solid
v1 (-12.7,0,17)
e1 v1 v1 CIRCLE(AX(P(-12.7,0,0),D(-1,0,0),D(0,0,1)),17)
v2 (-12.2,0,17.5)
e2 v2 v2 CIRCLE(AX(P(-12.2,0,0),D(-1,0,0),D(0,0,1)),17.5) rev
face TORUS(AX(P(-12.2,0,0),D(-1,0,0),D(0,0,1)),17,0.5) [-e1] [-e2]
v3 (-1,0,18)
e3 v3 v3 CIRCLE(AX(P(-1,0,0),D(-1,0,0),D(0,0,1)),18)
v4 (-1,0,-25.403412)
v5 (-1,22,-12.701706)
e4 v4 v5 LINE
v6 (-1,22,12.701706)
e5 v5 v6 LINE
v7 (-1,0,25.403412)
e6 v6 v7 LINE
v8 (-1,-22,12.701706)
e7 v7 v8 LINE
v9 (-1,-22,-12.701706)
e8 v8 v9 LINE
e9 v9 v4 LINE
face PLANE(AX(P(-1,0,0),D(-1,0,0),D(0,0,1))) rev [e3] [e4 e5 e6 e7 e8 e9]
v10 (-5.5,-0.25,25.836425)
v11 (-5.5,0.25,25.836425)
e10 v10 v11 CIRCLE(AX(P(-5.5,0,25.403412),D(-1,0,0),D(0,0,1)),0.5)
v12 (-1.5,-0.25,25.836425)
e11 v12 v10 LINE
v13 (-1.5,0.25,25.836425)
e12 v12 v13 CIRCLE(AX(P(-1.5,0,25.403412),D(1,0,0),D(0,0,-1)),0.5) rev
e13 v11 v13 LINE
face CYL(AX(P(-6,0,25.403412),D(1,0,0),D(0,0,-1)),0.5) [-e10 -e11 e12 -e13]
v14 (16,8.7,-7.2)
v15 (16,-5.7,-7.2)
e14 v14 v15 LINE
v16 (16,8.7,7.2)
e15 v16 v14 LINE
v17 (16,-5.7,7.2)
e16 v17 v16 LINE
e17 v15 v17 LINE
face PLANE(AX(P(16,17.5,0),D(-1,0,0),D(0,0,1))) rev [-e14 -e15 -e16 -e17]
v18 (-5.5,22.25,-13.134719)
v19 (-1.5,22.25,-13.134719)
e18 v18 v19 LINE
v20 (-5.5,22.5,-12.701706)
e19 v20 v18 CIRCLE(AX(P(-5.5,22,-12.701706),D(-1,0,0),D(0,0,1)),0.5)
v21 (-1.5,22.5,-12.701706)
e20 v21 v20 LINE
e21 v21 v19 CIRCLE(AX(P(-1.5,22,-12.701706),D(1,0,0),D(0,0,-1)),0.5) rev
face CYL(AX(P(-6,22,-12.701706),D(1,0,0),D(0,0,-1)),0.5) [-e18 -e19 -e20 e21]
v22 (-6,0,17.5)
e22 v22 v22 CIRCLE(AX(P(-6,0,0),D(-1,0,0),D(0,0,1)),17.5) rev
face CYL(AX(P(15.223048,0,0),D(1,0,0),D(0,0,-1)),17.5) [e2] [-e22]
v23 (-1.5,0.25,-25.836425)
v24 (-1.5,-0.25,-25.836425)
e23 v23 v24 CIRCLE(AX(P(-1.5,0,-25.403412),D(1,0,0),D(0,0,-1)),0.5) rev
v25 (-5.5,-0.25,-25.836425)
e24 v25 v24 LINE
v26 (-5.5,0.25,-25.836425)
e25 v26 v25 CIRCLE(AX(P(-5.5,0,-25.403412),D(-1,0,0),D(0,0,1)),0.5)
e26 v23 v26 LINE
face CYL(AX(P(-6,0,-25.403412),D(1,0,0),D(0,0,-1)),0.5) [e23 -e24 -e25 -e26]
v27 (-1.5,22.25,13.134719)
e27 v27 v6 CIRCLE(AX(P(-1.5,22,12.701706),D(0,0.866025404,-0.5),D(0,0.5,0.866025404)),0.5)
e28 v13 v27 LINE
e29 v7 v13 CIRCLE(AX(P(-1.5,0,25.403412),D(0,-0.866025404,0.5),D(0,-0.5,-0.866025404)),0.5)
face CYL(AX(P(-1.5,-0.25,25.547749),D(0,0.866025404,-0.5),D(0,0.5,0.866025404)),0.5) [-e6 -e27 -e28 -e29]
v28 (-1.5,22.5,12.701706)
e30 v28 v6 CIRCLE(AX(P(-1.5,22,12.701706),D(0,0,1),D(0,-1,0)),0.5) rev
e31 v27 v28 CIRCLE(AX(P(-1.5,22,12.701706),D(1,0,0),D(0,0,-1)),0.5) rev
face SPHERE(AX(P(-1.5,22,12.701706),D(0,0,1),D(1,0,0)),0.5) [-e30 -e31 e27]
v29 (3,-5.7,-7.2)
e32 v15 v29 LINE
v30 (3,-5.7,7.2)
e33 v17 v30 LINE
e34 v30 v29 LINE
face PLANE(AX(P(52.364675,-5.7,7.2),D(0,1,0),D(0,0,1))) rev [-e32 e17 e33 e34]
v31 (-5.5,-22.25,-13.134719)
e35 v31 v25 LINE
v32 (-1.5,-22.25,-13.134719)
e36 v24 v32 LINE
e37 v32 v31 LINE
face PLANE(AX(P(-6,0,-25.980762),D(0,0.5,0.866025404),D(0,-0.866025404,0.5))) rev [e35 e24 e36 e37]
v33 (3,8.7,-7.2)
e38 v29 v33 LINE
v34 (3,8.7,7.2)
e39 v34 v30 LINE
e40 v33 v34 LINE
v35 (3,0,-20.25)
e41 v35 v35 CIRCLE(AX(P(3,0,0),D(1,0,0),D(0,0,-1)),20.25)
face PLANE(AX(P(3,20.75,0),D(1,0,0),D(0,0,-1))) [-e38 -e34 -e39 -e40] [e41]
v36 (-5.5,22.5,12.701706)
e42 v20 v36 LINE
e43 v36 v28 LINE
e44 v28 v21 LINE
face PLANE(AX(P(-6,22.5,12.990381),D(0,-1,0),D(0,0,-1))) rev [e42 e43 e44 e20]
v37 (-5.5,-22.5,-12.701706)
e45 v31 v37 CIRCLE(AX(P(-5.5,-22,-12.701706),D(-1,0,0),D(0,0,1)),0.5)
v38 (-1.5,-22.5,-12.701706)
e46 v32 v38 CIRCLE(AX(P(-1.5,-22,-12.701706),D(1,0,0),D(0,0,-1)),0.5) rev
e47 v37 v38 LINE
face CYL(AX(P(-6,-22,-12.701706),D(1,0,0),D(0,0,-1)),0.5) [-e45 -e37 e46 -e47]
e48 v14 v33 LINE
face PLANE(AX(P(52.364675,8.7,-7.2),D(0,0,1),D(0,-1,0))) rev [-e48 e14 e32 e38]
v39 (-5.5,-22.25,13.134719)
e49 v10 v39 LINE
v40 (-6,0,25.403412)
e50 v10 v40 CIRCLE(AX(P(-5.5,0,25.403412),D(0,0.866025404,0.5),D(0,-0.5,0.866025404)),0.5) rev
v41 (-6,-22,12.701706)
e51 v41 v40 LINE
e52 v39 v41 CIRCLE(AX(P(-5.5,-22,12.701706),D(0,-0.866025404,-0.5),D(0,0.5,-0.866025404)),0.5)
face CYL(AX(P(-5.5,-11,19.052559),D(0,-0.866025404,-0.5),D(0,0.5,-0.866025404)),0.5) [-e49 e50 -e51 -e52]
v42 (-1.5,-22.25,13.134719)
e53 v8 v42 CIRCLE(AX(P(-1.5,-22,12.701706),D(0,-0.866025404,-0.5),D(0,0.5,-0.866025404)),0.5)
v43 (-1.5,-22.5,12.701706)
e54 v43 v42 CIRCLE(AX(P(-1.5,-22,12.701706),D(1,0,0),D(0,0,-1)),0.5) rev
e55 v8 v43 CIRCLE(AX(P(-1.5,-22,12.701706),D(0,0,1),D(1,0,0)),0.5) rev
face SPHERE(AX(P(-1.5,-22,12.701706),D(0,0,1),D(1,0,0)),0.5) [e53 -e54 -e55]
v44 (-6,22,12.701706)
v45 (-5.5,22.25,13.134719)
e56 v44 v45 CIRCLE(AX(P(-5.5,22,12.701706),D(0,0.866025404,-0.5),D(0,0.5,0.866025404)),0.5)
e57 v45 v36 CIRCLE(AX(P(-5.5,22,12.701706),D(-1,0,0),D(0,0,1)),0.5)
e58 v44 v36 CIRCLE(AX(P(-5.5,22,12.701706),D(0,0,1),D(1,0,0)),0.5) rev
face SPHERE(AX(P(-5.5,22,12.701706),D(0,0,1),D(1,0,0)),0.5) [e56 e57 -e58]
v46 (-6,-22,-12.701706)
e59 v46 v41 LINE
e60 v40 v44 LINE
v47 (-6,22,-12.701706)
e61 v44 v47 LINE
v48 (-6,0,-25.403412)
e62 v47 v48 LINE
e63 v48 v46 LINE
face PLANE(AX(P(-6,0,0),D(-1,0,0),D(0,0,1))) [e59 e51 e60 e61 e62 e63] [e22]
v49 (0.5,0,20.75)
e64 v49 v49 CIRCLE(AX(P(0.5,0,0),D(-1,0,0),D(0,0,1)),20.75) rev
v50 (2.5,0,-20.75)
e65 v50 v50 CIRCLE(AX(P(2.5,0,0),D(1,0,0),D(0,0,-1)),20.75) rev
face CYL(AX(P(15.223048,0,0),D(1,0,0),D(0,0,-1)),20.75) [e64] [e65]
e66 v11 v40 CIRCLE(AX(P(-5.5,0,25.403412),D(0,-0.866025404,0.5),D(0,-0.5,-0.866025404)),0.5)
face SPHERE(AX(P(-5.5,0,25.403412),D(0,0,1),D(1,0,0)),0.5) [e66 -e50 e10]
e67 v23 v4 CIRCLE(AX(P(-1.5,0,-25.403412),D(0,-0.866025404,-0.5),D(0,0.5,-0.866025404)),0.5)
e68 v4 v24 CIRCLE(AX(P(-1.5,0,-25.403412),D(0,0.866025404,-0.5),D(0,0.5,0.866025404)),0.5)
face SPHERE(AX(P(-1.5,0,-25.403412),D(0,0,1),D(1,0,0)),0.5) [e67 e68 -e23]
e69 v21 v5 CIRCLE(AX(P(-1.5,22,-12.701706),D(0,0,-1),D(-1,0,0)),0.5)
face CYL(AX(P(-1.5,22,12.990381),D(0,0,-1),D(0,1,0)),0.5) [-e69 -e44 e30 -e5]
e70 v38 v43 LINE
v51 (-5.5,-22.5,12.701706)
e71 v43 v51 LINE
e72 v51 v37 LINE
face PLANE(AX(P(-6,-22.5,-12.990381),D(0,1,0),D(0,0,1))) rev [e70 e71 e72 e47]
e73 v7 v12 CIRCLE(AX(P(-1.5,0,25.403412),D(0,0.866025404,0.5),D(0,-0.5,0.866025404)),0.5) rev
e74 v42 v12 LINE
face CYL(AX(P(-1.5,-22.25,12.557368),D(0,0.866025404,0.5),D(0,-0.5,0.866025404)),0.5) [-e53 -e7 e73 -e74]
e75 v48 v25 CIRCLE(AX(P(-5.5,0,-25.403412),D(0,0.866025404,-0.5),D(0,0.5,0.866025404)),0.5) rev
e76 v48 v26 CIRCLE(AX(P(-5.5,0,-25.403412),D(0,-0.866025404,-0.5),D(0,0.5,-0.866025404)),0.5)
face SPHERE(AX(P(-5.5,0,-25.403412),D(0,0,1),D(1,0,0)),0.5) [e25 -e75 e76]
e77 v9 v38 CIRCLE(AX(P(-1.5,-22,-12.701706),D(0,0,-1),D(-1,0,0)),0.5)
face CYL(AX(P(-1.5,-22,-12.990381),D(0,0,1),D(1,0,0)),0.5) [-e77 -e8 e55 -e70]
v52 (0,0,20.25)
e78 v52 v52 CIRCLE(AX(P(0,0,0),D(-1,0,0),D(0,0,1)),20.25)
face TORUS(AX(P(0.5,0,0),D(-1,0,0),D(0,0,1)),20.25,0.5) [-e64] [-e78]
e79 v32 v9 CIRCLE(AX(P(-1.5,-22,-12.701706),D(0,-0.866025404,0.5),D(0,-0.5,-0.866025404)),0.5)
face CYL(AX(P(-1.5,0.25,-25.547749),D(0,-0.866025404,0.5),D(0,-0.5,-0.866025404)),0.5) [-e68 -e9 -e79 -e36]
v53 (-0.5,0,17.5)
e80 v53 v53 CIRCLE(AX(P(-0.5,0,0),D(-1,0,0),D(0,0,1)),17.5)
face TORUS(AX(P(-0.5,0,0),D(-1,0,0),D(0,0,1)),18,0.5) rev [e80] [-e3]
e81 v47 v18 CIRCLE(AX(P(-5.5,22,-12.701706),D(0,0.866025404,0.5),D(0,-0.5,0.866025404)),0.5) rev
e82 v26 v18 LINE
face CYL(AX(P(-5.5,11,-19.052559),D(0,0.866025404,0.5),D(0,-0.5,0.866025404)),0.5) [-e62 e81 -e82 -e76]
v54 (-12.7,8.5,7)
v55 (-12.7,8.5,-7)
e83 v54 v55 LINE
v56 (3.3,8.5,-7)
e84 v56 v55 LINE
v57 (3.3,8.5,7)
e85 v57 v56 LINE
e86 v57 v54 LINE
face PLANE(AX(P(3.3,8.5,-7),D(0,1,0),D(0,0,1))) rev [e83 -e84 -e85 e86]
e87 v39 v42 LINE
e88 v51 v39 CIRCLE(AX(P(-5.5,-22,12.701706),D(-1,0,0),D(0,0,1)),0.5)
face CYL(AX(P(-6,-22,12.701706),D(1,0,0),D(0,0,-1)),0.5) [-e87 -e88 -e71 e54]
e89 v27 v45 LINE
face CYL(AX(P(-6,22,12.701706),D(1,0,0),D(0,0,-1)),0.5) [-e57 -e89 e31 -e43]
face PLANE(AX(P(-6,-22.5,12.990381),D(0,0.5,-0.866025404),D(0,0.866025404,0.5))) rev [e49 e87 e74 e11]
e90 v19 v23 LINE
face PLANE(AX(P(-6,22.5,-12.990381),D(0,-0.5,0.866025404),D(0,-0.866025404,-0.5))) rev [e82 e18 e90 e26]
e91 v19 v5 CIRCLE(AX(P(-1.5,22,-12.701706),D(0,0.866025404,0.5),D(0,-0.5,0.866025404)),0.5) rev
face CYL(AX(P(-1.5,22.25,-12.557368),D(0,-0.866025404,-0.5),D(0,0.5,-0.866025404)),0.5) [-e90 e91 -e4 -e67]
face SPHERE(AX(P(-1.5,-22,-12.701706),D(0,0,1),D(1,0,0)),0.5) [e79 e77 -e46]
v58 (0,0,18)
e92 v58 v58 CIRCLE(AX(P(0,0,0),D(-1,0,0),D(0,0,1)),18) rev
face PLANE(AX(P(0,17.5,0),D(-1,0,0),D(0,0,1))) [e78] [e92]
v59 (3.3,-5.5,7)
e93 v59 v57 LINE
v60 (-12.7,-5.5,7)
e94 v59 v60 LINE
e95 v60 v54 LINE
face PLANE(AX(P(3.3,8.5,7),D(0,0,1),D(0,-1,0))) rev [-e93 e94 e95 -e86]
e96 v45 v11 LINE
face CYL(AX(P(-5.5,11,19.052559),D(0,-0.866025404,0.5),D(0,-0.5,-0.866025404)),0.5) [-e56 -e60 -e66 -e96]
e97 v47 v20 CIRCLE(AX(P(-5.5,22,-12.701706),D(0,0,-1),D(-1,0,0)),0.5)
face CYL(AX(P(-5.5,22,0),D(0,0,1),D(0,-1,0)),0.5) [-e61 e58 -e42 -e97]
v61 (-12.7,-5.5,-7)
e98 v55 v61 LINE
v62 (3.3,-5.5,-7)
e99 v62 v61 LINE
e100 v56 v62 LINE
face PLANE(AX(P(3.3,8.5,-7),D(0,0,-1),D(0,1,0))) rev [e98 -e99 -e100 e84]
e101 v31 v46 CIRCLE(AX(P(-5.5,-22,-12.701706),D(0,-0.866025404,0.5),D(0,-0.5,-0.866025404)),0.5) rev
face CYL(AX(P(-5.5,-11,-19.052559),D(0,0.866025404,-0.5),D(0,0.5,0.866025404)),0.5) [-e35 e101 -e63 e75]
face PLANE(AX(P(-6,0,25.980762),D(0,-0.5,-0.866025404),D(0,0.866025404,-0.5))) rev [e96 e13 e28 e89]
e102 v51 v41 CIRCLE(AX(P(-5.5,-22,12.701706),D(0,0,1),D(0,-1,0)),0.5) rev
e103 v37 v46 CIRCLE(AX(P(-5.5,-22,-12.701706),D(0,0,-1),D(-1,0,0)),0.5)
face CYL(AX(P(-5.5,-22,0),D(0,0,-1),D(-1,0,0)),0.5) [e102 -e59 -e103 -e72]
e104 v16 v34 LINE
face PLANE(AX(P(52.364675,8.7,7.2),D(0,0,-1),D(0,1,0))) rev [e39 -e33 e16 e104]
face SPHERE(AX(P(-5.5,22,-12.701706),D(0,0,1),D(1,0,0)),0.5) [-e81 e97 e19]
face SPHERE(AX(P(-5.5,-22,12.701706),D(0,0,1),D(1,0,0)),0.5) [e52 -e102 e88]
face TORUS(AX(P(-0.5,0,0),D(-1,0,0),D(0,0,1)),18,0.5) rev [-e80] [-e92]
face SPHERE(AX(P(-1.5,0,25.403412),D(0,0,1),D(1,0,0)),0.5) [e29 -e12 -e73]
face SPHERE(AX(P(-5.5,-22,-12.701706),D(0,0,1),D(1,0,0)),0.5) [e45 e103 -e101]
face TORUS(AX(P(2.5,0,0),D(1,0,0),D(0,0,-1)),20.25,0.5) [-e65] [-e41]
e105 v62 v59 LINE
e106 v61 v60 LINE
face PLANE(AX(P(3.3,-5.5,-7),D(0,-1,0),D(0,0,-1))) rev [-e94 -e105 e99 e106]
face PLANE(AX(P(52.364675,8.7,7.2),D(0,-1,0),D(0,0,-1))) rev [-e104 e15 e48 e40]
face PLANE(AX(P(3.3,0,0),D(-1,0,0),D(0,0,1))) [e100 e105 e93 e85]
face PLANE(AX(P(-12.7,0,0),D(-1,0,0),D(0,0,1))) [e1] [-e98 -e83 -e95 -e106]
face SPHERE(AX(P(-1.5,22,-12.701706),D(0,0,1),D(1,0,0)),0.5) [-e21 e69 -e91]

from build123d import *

# Parameters (mm, degrees)
BOSS_EXTRU_1_START      = 1
BOSS_EXTRU_1_DEPTH      = 5
ESQUISSE3_W             = 14.4
ESQUISSE3_H             = 14.4
BOSS_EXTRU_2_DEPTH      = 13
CONG_1_R                = 0.5
ESQUISSE4_W             = 14
ESQUISSE4_H             = 14
ENL_V_MAT_EXTRU_1_DEPTH = 16


with BuildPart() as part:
    # Esquisse1 → Révolution1 (revolve)
    with BuildSketch(Plane.XY, mode=Mode.PRIVATE) as r_volution1_sk:
        Polygon((-12.7, 0), (-12.7, 17.5), (0, 17.5), (0, 20.75), (3, 20.75), (3, 0), align=None)
    revolve(r_volution1_sk.sketch.rotate(Axis((15.223048327, 0, 0), (-1, 0, 0)), 90), axis=Axis((15.223048327, 0, 0), (-1, 0, 0)))

    # Esquisse2 → Boss.-Extru.1 (add)
    with BuildSketch(Plane.ZY.offset(BOSS_EXTRU_1_START)):
        Polygon((12.990381057, -22.5), (25.980762114, 0), (12.990381057, 22.5), (-12.990381057, 22.5), (-25.980762114, 0), (-12.990381057, -22.5), align=None)
    extrude(amount=BOSS_EXTRU_1_DEPTH)

    # Esquisse3 → Boss.-Extru.2 (add)
    with BuildSketch(Plane(origin=(3, 0, 0), x_dir=(0, 0, -1), z_dir=(1, 0, 0))):
        with Locations((0, 1.5)):
            Rectangle(ESQUISSE3_W, ESQUISSE3_H)
    extrude(amount=BOSS_EXTRU_2_DEPTH)

    # Congé1
    cong_1_edges = [part.edges().sort_by_distance(p)[0] for p in [
        (-1, 0, 17.5),
        (-1, -22.5, 0),
        (-3.5, -22.5, -12.990381057),
        (-1, -11.25, 19.485571585),
        (-3.5, -22.5, 12.990381057),
        (-1, 11.25, 19.485571585),
        (-3.5, 0, 25.980762114),
        (-1, 22.5, 0),
        (-3.5, 22.5, 12.990381057),
        (-1, 11.25, -19.485571585),
        (-3.5, 22.5, -12.990381057),
        (-1, -11.25, -19.485571585),
        (-3.5, 0, -25.980762114),
        (-6, -22.5, 0),
        (-6, -11.25, 19.485571585),
        (-6, 11.25, 19.485571585),
        (-6, 22.5, 0),
        (-6, 11.25, -19.485571585),
        (-6, -11.25, -19.485571585),
        (3, 0, 20.75),
        (0, 0, 20.75),
        (0, 0, 17.5),
        (-12.7, 0, 17.5),
    ]]
    fillet(cong_1_edges, radius=CONG_1_R - 0.0001)  # a hair under: the kernel refuses the full size

    # Esquisse4 → Enlèv. mat.-Extru.1 (cut)
    with BuildSketch(Plane.ZY.offset(12.7)):
        with Locations((0, 1.5)):
            Rectangle(ESQUISSE4_W, ESQUISSE4_H)
    extrude(amount=-ENL_V_MAT_EXTRU_1_DEPTH, mode=Mode.SUBTRACT)


solid = part.part
